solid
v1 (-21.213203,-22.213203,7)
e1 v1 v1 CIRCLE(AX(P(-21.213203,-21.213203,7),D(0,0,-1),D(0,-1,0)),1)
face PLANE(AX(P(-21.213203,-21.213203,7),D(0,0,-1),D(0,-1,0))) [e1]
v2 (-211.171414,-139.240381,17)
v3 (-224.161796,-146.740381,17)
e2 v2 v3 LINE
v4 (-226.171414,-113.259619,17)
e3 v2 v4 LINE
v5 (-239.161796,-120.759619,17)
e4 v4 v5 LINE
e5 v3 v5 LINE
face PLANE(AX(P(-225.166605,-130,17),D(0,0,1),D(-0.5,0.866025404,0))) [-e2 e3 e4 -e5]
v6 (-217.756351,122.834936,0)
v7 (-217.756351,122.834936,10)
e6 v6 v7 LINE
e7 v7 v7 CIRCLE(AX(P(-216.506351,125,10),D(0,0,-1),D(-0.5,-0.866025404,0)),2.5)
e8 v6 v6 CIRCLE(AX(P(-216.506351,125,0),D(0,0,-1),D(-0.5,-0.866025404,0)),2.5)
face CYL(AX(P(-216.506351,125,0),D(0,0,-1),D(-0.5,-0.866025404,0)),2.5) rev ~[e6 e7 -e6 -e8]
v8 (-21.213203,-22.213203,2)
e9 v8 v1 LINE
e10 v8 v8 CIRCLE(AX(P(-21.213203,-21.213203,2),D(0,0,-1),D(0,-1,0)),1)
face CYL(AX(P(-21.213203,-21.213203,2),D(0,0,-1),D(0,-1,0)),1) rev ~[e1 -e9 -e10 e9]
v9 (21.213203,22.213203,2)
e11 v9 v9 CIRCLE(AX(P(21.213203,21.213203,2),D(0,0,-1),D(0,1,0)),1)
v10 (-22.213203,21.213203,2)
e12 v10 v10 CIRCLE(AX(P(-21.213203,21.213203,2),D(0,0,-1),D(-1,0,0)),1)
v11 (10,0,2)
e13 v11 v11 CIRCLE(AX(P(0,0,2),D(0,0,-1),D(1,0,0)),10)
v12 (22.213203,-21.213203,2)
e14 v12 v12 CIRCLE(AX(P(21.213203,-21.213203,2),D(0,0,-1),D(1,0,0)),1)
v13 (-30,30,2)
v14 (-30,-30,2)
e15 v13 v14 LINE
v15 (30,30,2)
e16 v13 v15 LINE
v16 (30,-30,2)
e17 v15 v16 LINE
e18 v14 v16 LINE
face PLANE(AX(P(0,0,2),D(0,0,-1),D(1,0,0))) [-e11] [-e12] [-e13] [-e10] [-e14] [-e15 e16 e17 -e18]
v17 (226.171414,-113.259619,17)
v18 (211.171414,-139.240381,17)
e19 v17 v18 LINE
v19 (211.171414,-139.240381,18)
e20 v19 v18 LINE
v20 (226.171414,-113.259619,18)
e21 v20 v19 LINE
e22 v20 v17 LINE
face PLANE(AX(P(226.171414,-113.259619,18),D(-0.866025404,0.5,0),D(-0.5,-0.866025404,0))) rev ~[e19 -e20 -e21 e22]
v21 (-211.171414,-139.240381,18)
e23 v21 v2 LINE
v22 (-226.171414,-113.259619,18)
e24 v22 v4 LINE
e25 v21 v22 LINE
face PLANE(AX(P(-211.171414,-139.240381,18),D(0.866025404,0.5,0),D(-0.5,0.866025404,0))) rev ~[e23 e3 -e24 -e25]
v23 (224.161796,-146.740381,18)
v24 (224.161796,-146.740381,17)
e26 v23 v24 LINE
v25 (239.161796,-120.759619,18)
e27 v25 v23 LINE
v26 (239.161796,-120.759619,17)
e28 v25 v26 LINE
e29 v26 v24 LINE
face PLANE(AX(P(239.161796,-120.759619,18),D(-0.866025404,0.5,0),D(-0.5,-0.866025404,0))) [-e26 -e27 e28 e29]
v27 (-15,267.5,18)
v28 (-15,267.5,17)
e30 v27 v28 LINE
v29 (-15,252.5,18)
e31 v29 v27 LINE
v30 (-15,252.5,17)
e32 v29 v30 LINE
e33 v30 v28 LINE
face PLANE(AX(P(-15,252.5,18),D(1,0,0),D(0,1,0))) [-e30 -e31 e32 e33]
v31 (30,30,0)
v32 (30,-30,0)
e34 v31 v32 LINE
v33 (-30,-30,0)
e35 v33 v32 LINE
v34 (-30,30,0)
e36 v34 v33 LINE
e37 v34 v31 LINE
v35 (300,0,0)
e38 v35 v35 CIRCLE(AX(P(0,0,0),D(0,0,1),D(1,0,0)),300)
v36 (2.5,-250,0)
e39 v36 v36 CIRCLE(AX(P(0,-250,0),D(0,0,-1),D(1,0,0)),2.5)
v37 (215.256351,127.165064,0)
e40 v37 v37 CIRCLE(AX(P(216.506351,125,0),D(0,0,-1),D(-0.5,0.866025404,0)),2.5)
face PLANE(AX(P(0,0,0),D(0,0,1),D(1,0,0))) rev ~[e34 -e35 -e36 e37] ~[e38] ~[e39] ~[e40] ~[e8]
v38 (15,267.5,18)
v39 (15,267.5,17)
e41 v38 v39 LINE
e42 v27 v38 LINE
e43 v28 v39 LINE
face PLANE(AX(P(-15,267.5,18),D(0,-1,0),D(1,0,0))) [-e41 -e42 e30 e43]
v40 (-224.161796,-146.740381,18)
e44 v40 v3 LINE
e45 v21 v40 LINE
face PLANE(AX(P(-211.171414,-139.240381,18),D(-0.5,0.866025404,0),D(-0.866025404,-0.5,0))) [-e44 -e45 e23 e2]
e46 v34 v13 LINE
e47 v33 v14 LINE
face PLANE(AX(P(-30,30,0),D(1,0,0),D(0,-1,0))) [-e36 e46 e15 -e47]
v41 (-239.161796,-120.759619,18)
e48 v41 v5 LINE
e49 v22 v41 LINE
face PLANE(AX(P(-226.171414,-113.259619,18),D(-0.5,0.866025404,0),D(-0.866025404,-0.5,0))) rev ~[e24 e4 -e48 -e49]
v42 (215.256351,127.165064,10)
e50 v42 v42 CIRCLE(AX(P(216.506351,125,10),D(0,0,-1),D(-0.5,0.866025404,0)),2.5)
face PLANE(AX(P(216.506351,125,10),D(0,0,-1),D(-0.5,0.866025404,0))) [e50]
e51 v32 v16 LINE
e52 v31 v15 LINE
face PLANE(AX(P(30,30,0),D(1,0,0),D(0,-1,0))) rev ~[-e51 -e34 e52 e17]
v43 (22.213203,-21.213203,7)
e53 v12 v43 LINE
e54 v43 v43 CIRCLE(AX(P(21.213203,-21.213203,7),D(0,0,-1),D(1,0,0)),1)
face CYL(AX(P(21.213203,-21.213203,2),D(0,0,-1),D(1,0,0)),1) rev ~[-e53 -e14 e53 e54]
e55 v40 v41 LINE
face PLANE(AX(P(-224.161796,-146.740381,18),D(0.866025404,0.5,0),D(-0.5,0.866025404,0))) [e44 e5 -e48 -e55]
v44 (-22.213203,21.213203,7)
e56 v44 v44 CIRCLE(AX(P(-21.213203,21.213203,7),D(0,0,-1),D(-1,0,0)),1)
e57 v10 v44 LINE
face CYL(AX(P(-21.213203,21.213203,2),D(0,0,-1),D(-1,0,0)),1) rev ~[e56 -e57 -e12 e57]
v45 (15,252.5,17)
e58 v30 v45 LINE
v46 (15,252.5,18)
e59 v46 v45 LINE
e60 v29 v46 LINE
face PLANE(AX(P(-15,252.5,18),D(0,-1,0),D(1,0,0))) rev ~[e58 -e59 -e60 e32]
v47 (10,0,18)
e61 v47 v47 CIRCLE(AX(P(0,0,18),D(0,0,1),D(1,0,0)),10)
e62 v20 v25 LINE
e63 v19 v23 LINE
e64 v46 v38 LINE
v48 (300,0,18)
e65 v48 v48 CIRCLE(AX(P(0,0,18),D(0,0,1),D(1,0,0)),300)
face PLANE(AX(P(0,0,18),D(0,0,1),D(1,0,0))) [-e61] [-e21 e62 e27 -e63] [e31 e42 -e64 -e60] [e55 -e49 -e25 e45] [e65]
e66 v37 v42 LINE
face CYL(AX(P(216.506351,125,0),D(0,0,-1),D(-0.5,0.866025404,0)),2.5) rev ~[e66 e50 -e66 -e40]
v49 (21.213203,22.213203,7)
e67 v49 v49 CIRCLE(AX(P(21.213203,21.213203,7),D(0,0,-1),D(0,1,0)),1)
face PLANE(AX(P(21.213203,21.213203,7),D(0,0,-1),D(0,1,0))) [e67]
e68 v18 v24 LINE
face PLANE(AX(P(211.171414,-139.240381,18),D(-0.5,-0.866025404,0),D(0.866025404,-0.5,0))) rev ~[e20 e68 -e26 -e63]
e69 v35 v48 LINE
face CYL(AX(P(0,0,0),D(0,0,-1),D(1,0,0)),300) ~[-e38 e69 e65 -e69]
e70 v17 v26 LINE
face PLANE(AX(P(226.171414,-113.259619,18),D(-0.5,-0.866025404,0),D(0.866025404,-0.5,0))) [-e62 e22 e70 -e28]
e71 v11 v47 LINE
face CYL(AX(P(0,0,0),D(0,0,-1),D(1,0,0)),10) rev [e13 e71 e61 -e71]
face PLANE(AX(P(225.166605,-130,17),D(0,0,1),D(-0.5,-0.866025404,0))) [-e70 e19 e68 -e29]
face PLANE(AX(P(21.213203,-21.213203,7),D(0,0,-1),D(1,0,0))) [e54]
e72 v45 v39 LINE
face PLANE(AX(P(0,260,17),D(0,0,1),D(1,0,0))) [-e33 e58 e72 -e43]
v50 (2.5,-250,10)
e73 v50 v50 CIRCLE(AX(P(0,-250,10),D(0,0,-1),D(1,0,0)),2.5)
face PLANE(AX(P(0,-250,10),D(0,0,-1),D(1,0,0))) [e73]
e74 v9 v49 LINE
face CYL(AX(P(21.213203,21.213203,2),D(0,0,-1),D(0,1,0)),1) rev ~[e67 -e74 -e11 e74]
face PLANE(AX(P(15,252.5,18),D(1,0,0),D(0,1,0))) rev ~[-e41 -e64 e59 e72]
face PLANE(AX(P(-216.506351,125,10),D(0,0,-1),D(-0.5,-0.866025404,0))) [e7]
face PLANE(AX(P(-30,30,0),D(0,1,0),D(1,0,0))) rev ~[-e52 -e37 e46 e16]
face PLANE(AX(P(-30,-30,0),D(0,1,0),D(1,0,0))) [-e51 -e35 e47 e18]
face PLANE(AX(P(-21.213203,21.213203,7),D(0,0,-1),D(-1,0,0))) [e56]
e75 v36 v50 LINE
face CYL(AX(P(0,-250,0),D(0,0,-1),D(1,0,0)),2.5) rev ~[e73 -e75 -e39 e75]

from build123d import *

# Parameters (mm, degrees)
F0_R            = 300
F0_R_2          = 10
F1_DEPTH        = 18
F2_R            = 2.5
F3_DEPTH        = 10
F3_COPIES_COUNT = 3
F4_W            = 60
F4_H            = 60
F5_DEPTH        = 2
F6_R            = 1
F7_DEPTH        = 5
F7_COPIES_COUNT = 4
F8_W            = 30
F8_H            = 15
F9_DEPTH        = 1
F9_COPIES_COUNT = 3


# Not quite as in the source:
# - a pattern or mirror of a feature is missing from the dataset's text; its kind, count and spacing are read off the source's solid


with BuildPart() as f1:
    # F0 (on Top) → F1 (new body)
    with BuildSketch(Plane.XY):
        Circle(F0_R)
        Circle(F0_R_2, mode=Mode.SUBTRACT)
    extrude(amount=F1_DEPTH)

    # F2 (on face) → F3 (cut)
    with BuildSketch(Plane(origin=(0, 0, 0), x_dir=(1, 0, 0), z_dir=(0, 0, -1))):
        with Locations((0, 250)):
            Circle(F2_R)
    f3 = extrude(amount=-F3_DEPTH, mode=Mode.SUBTRACT)

    # F3_copies: F3 ×3 about axis
    f3_copies_axis = Axis((0, 0, 0), (0, 0, 1))
    for i in range(1, F3_COPIES_COUNT):
        add(f3.rotate(f3_copies_axis, i * 360 / F3_COPIES_COUNT), mode=Mode.SUBTRACT)

    # F4 (on face) → F5 (cut)
    with BuildSketch(Plane(origin=(0, 0, 0), x_dir=(1, 0, 0), z_dir=(0, 0, -1))):
        Rectangle(F4_W, F4_H)
    extrude(amount=-F5_DEPTH, mode=Mode.SUBTRACT)

    # F6 (on face) → F7 (cut)
    with BuildSketch(Plane(origin=(0, 0, 2), x_dir=(1, 0, 0), z_dir=(0, 0, -1))):
        with Locations((21.2132034356, 21.2132034356)):
            Circle(F6_R)
    f7 = extrude(amount=-F7_DEPTH, mode=Mode.SUBTRACT)

    # F7_copies: F7 ×4 about axis
    f7_copies_axis = Axis((0, 0, 0), (0, 0, 1))
    for i in range(1, F7_COPIES_COUNT):
        add(f7.rotate(f7_copies_axis, i * 360 / F7_COPIES_COUNT), mode=Mode.SUBTRACT)

    # F8 (on face) → F9 (cut)
    with BuildSketch(Plane.XY.offset(18)):
        with Locations((0, 260)):
            Rectangle(F8_W, F8_H)
    f9 = extrude(amount=-F9_DEPTH, mode=Mode.SUBTRACT)

    # F9_copies: F9 ×3 about axis
    f9_copies_axis = Axis((0, 0, 0), (0, 0, 1))
    for i in range(1, F9_COPIES_COUNT):
        add(f9.rotate(f9_copies_axis, i * 360 / F9_COPIES_COUNT), mode=Mode.SUBTRACT)


solid = f1.part
